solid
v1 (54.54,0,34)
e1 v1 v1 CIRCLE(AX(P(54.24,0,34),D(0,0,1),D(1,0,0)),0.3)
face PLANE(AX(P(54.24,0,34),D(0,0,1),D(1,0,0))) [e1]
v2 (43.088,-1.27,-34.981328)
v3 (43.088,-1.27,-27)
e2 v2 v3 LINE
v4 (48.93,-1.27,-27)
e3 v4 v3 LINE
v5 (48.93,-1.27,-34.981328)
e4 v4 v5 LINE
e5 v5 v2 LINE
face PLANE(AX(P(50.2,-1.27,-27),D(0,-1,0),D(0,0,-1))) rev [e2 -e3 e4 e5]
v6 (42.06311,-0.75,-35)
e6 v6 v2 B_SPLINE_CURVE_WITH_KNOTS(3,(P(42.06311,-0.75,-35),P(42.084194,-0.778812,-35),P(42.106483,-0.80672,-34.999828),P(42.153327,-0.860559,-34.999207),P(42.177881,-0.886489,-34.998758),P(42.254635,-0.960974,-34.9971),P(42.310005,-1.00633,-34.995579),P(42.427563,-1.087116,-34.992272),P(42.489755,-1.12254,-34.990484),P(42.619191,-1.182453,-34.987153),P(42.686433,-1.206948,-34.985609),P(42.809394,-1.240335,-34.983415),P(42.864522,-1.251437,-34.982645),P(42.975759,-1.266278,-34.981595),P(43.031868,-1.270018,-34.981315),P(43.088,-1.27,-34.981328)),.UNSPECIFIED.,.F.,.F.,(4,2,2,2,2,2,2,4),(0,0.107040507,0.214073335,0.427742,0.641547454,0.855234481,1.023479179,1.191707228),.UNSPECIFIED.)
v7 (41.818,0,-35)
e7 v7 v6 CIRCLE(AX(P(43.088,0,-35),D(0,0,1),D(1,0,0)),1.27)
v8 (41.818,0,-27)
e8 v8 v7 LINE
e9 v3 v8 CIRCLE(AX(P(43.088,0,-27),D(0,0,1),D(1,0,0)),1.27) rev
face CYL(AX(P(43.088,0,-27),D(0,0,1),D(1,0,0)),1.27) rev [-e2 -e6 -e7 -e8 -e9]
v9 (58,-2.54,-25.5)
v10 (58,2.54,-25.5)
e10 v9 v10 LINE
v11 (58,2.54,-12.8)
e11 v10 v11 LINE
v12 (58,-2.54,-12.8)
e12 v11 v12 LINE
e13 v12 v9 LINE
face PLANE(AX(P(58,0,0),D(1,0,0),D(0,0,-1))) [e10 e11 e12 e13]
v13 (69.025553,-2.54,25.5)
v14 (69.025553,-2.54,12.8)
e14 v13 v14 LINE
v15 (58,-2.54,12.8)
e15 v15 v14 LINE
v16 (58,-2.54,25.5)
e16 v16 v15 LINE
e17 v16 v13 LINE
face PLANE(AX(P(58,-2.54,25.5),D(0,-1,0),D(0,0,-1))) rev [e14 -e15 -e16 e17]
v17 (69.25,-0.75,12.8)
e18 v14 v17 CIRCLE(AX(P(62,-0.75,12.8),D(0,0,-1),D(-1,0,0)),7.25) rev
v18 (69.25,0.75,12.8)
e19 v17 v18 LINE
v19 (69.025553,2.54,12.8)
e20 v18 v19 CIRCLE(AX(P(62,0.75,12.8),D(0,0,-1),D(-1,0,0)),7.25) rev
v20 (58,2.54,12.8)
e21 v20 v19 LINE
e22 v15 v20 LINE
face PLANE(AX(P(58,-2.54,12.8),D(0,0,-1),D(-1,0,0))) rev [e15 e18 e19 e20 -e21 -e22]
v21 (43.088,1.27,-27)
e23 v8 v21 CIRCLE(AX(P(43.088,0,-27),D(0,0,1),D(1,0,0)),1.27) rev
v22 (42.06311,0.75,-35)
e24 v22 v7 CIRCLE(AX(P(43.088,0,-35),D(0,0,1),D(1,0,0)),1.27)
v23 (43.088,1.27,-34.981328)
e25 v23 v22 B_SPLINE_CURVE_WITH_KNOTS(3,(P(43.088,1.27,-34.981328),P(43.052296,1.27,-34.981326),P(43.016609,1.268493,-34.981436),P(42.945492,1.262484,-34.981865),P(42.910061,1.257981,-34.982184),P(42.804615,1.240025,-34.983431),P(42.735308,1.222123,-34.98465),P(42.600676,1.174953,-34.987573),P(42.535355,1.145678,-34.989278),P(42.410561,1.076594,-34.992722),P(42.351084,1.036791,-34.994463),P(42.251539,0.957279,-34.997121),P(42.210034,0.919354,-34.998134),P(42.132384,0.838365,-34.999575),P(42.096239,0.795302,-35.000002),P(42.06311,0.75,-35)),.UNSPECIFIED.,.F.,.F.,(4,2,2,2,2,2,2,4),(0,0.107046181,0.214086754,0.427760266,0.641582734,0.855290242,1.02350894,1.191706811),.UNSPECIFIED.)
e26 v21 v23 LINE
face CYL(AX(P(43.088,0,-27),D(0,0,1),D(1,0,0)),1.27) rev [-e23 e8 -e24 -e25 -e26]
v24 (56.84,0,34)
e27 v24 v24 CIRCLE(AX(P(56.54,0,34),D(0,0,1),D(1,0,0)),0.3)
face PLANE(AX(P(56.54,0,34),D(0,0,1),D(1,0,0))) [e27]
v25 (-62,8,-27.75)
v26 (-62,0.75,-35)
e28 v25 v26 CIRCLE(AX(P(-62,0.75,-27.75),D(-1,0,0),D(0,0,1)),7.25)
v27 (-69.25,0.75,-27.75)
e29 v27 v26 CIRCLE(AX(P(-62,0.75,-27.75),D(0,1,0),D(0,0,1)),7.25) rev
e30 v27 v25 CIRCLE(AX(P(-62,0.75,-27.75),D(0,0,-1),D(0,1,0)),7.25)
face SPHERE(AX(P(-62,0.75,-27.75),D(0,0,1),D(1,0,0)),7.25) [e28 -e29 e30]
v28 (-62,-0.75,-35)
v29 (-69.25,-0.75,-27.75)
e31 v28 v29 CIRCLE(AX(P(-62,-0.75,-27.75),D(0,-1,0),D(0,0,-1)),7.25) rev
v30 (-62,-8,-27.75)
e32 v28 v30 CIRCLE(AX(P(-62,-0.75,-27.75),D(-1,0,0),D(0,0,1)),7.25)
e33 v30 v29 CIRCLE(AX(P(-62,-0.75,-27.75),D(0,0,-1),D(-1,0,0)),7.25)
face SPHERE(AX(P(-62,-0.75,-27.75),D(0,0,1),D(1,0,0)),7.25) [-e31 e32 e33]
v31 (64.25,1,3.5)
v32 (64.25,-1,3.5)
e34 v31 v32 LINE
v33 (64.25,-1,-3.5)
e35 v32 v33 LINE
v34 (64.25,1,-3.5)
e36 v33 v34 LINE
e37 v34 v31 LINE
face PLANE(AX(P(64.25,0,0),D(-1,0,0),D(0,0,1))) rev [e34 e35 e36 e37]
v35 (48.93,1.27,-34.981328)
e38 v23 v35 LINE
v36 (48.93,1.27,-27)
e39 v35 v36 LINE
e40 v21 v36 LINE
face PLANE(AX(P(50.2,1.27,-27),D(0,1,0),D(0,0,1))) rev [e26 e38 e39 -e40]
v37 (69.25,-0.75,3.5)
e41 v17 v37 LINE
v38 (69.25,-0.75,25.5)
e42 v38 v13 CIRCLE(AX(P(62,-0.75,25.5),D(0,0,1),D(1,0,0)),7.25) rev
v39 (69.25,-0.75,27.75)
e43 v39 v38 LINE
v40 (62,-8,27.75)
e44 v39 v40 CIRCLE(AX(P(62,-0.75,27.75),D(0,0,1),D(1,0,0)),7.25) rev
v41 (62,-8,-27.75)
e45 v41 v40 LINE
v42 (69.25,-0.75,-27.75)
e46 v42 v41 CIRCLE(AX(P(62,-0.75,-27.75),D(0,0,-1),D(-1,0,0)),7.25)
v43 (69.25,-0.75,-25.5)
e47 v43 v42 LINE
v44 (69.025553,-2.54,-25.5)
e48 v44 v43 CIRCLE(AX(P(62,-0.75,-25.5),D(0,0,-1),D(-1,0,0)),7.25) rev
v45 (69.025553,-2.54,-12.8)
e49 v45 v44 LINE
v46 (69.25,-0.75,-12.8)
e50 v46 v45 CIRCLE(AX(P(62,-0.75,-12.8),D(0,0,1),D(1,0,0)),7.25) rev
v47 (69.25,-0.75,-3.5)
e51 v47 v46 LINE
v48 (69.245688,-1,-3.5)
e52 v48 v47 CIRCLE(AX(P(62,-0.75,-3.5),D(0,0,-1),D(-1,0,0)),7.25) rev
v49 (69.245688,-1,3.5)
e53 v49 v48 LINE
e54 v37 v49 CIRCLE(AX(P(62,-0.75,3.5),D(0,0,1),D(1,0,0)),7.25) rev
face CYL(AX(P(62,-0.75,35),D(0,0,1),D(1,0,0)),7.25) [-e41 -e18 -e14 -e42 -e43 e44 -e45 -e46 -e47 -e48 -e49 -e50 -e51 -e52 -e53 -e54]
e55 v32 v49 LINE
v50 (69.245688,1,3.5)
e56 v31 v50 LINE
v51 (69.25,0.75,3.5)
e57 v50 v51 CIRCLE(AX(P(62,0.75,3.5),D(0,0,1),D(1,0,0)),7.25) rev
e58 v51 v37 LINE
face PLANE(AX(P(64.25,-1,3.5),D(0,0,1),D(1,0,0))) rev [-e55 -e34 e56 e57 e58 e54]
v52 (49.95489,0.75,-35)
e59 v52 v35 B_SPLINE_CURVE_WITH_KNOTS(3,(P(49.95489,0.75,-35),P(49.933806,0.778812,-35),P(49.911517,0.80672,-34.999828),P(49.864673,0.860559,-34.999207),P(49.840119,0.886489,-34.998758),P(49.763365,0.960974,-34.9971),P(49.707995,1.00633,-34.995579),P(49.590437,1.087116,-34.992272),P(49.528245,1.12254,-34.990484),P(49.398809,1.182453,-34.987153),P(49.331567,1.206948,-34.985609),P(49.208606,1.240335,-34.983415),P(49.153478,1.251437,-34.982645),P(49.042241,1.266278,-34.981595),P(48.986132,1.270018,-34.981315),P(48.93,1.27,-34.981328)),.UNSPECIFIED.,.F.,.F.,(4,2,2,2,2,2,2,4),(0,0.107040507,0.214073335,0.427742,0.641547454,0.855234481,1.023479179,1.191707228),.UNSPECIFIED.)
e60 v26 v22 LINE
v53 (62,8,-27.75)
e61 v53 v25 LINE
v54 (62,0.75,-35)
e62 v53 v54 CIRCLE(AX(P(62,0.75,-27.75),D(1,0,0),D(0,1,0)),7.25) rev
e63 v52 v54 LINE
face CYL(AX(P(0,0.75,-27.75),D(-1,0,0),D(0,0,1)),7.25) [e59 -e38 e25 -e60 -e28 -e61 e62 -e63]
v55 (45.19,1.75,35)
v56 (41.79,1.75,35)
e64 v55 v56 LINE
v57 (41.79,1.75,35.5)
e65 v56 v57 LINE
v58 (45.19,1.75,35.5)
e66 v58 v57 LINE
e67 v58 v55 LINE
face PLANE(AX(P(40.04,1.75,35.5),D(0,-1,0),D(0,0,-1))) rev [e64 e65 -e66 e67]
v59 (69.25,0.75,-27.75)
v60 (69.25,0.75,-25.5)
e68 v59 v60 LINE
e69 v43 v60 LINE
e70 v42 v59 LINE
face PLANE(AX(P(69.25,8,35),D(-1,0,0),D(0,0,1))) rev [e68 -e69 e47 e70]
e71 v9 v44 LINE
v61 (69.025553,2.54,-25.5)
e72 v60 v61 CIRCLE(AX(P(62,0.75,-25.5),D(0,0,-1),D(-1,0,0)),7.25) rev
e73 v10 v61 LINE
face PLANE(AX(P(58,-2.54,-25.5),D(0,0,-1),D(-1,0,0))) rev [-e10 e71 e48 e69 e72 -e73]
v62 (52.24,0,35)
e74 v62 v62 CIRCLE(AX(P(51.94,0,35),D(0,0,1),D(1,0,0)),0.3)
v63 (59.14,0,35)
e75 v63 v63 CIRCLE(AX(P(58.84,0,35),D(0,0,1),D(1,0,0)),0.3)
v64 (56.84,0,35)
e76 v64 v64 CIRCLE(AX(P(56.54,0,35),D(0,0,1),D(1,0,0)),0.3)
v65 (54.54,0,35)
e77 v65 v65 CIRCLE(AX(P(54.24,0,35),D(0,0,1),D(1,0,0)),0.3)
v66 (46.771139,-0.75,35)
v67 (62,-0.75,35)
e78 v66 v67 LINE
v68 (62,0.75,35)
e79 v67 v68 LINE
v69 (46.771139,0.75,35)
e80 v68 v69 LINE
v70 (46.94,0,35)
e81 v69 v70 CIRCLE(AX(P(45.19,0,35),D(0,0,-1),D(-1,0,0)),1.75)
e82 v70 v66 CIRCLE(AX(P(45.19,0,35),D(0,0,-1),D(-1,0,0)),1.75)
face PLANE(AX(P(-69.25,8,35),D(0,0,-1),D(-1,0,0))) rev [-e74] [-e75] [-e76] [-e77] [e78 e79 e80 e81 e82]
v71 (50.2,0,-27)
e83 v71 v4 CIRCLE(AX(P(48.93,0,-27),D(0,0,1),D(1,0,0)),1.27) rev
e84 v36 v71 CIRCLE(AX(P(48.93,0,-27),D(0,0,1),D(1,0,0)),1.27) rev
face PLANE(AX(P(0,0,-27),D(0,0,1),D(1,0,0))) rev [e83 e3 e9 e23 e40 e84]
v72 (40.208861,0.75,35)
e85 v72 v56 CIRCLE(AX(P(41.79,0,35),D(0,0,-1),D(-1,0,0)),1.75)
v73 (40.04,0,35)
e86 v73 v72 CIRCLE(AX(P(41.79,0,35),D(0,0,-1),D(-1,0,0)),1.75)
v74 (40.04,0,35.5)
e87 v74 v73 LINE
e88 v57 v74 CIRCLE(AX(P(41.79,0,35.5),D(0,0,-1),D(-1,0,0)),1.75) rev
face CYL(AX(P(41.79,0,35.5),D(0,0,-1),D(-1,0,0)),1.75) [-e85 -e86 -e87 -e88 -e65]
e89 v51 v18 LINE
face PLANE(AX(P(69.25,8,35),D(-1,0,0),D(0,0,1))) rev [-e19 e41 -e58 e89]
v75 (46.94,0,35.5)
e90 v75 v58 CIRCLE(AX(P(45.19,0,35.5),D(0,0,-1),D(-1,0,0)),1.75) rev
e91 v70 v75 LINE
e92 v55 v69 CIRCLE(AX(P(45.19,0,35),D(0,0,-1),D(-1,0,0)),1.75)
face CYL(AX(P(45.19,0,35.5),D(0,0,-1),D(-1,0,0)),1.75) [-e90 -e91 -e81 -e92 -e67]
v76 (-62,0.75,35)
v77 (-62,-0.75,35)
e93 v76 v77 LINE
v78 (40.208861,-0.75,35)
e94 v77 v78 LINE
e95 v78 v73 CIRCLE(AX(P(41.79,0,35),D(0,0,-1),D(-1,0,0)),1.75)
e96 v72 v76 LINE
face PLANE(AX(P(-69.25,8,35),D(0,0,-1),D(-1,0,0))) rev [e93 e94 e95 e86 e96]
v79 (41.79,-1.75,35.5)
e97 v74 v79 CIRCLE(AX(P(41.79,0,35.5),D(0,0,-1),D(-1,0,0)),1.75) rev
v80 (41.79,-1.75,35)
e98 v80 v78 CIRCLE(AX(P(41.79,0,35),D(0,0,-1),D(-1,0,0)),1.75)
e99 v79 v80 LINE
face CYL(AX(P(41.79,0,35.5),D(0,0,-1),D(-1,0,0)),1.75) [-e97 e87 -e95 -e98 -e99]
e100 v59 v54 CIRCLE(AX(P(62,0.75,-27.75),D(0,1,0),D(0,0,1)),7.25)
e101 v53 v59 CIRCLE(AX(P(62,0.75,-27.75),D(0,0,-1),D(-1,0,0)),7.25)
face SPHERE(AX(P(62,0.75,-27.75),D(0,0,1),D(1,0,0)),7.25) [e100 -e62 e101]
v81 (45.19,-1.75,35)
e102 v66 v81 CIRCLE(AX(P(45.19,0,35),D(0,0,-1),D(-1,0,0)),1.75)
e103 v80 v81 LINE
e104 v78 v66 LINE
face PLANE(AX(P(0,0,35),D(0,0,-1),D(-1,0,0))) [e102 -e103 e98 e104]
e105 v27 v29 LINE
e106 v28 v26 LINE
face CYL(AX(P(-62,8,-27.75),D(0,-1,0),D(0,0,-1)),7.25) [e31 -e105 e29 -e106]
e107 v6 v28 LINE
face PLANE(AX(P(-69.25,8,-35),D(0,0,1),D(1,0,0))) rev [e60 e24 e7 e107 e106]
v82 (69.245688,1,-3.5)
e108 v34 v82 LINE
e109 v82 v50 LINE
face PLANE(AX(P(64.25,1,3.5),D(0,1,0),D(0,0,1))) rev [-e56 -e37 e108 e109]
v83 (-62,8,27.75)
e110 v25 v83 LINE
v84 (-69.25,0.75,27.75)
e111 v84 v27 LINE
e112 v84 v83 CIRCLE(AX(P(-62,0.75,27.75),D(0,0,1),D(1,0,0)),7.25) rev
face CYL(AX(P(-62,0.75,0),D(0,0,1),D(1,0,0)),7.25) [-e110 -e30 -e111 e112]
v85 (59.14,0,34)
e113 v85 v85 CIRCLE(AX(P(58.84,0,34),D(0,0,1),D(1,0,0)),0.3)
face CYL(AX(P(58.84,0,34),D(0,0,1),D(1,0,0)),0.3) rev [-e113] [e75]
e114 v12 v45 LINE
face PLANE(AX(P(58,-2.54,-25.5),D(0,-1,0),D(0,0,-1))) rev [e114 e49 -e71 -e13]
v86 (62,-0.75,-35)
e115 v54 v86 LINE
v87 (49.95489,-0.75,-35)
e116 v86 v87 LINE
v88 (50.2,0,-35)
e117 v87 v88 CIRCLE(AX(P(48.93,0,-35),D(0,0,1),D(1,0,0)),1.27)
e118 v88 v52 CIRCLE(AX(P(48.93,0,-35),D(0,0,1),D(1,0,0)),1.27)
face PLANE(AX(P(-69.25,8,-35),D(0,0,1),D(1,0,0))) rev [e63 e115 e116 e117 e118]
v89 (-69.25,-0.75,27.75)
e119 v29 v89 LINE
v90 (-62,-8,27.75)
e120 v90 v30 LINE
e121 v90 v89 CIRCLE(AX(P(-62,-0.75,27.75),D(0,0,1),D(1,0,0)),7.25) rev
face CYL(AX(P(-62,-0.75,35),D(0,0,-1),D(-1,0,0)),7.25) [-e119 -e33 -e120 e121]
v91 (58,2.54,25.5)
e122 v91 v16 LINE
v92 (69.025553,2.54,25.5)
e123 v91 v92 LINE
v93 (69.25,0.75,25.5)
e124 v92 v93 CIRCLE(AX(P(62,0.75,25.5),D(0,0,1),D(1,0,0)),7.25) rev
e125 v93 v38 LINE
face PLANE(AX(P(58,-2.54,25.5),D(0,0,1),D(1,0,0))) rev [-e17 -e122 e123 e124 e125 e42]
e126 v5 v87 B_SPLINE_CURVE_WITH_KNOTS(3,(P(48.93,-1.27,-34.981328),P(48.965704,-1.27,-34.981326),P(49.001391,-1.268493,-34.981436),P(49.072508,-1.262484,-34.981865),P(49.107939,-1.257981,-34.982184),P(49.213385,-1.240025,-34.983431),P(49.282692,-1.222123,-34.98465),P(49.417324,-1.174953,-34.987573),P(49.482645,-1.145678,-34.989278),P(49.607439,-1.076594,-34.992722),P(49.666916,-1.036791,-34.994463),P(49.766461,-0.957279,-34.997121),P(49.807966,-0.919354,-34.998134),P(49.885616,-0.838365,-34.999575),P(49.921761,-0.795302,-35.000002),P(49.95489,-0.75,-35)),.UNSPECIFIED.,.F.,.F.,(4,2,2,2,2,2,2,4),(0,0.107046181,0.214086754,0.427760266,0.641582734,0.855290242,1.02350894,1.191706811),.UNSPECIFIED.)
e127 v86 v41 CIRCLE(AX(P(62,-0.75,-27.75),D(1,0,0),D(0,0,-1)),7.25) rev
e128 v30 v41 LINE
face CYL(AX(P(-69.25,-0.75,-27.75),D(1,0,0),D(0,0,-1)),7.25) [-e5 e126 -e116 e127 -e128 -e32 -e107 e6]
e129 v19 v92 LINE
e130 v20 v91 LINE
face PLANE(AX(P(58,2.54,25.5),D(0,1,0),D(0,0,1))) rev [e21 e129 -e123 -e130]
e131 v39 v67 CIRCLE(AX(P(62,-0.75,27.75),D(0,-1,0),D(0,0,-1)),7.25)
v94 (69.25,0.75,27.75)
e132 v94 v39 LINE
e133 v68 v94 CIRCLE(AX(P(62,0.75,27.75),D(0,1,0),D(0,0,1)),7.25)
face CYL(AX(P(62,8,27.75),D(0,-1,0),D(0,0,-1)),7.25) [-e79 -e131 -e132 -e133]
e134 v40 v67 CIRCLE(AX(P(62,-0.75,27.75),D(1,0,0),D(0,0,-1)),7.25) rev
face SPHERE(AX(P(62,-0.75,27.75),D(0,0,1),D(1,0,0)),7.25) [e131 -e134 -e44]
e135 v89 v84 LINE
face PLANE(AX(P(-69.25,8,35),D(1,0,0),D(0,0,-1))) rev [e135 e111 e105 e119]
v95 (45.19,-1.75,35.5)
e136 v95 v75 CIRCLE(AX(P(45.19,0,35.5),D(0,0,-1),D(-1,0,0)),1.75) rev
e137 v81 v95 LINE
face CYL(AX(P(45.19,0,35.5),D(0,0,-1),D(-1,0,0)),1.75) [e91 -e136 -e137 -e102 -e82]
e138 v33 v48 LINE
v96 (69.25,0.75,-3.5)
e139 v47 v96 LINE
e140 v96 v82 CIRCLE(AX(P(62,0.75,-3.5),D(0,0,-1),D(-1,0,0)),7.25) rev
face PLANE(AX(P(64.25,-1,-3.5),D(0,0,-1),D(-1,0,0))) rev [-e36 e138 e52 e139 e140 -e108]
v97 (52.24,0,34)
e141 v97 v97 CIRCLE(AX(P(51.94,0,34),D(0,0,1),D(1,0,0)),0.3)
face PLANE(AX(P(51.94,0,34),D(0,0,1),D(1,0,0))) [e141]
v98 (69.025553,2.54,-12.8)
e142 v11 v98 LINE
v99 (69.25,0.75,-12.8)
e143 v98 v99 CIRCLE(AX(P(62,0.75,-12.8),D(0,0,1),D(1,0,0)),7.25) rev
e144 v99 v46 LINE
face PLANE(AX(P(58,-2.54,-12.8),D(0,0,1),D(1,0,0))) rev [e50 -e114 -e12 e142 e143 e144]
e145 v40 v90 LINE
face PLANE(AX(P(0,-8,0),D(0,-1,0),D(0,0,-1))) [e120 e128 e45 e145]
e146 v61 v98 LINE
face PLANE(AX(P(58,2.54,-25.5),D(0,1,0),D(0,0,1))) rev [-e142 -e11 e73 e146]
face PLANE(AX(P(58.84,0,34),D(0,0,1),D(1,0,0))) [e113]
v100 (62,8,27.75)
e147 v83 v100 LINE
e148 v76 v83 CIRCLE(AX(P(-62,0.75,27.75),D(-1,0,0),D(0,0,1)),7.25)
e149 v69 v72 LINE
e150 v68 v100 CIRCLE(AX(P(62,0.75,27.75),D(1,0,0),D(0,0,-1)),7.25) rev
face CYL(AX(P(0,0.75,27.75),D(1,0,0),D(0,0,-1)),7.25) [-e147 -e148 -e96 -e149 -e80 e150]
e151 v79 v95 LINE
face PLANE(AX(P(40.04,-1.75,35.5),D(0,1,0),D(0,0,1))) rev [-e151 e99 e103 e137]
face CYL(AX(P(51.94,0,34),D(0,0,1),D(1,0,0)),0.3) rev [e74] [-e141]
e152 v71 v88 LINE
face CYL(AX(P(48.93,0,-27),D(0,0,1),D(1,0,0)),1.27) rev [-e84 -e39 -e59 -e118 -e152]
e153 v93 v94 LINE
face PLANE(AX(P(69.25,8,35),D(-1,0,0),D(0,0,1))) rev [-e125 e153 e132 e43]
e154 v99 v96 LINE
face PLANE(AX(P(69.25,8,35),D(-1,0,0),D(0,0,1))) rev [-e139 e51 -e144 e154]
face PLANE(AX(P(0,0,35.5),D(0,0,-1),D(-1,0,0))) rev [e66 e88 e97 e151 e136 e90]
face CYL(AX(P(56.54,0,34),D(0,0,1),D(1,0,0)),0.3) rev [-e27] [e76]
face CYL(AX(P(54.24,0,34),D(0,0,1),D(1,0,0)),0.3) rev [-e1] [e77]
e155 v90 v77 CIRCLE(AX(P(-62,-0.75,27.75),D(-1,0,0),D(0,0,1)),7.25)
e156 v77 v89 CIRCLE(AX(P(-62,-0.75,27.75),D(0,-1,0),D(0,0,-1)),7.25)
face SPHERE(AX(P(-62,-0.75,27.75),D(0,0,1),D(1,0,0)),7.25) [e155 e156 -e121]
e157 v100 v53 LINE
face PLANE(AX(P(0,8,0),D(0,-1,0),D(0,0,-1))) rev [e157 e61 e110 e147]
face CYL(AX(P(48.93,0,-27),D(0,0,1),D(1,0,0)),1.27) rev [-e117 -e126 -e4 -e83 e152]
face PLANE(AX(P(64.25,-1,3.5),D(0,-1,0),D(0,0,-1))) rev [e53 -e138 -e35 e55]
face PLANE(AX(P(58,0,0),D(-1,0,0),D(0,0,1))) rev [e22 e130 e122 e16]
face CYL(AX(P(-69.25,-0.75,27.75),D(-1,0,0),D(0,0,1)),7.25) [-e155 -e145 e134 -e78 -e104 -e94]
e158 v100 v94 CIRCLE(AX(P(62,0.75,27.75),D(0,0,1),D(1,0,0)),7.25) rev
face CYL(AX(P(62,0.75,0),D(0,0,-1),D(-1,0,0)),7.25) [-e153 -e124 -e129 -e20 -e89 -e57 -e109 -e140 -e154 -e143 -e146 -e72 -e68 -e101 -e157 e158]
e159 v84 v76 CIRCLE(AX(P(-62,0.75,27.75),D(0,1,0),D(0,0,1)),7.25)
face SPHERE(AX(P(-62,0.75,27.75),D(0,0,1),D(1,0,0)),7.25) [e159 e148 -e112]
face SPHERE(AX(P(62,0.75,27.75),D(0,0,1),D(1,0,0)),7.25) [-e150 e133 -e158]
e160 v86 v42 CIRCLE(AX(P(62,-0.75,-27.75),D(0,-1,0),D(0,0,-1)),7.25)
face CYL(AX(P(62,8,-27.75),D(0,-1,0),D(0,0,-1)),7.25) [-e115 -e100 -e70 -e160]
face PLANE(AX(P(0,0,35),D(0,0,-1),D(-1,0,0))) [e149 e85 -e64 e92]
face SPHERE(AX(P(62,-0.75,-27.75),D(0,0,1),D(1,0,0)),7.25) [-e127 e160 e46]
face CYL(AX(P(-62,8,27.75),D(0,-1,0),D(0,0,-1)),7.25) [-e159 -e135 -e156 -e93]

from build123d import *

# Parameters (mm, degrees)
SKETCH1_W                  = 138.5
SKETCH1_H                  = 70
BOSS_EXTRUDE1_DEPTH        = 8
FILLET1_R                  = 7.25
SKETCH3_W                  = 12.7
SKETCH3_H                  = 5.08
USB_A_DEPTH                = 11.25
SKETCH4_W                  = 7
SKETCH4_H                  = 2
USB_MICRO_NOTTOSCALE_DEPTH = 5
SKETCH5_W                  = 8.382
SKETCH5_H                  = 2.54
USB_C_DEPTH                = 8
FILLET2_R                  = 1.27
SKETCH6_W                  = 6.9
SKETCH6_H                  = 3.5
BATTERY_LEVEL_DEPTH        = 0.5
FILLET3_R                  = 1.75
SKETCH7_R                  = 0.3
BATTERY_LIGHTS_DEPTH       = 1


# Some blends are built 0.0001 mm under size
with BuildPart() as part:
    # Sketch1 → Boss-Extrude1 (new, symmetric)
    with BuildSketch(Plane(origin=(0, 0, 0), x_dir=(1, 0, 0), z_dir=(0, 1, 0))):
        Rectangle(SKETCH1_W, SKETCH1_H)
    extrude(amount=BOSS_EXTRUDE1_DEPTH, both=True)

    # Fillet1
    fillet1_edges = [part.edges().sort_by_distance(p)[0] for p in [
        (-69.25, 8, 0),
        (0, 8, 35),
        (69.25, 8, 0),
        (0, -8, 35),
        (-69.25, -8, 0),
        (0, -8, -35),
        (69.25, -8, 0),
        (69.25, 0, 35),
        (-69.25, 0, 35),
        (-69.25, 0, -35),
        (69.25, 0, -35),
        (0, 8, -35),
    ]]
    fillet(fillet1_edges, radius=FILLET1_R)

    # Sketch3 → USB-A (cut)
    with BuildSketch(Plane(origin=(69.25, 0, 0), x_dir=(0, 0, -1), z_dir=(1, 0, 0))):
        with Locations((-19.15, 0)):
            Rectangle(SKETCH3_W, SKETCH3_H)
        with Locations((19.15, 0)):
            Rectangle(SKETCH3_W, SKETCH3_H)
    extrude(amount=-USB_A_DEPTH, mode=Mode.SUBTRACT)

    # Sketch4 → USB-micro-NOTtoSCALE (cut)
    with BuildSketch(Plane(origin=(69.25, 0, 0), x_dir=(0, 0, -1), z_dir=(1, 0, 0))):
        Rectangle(SKETCH4_W, SKETCH4_H)
    extrude(amount=-USB_MICRO_NOTTOSCALE_DEPTH, mode=Mode.SUBTRACT)

    # Sketch5 → USB-C (cut)
    with BuildSketch(Plane(origin=(0, 0, -35), x_dir=(-1, 0, 0), z_dir=(0, 0, -1))):
        with Locations((-46.009, 0)):
            Rectangle(SKETCH5_W, SKETCH5_H)
    extrude(amount=-USB_C_DEPTH, mode=Mode.SUBTRACT)

    # Fillet2
    fillet2_edges = [part.edges().sort_by_distance(p)[0] for p in [
        (41.818, 1.27, -30.990663839),
        (41.818, -1.27, -30.990663839),
        (50.2, -1.27, -30.990663839),
        (50.2, 1.27, -30.990663839),
    ]]
    fillet(fillet2_edges, radius=FILLET2_R - 0.0001)  # a hair under: the kernel refuses the full size

    # Sketch6 → battery level (add)
    with BuildSketch(Plane.XY.offset(35)):
        with Locations((43.49, 0)):
            Rectangle(SKETCH6_W, SKETCH6_H)
    extrude(amount=BATTERY_LEVEL_DEPTH)

    # Fillet3
    # the kernel refuses this fillet: 1.75 mm, written as the material it takes off along each edge
    with BuildSketch(Plane(origin=(40.04, -1.75, 35), x_dir=(0, 1, 0), z_dir=(0, 0, 1))) as fillet3_piece_1:
        with BuildLine():
            CenterArc((FILLET3_R, -FILLET3_R), FILLET3_R, 90, 90)
            Line((0, -FILLET3_R), (0, 0))
            Line((0, 0), (FILLET3_R, 0))
        make_face()
    extrude(amount=4.875, mode=Mode.SUBTRACT)
    with BuildSketch(Plane(origin=(40.04, 1.75, 35), x_dir=(0, -1, 0), z_dir=(0, 0, 1)), Plane(origin=(46.94, -1.75, 35), x_dir=(0, 1, 0), z_dir=(0, 0, 1)), Plane(origin=(46.94, 1.75, 35), x_dir=(-1, 0, 0), z_dir=(0, 0, 1))) as fillet3_piece_2:
        with BuildLine():
            CenterArc((FILLET3_R, FILLET3_R), FILLET3_R, 180, 90)
            Line((0, FILLET3_R), (0, 0))
            Line((0, 0), (FILLET3_R, 0))
        make_face()
    extrude(amount=4.875, mode=Mode.SUBTRACT)

    # Sketch7 → battery lights (cut)
    with BuildSketch(Plane.XY.offset(35)):
        with Locations((51.94, 0)):
            Circle(SKETCH7_R)
        with Locations((54.24, 0)):
            Circle(SKETCH7_R)
        with Locations((56.54, 0)):
            Circle(SKETCH7_R)
        with Locations((58.84, 0)):
            Circle(SKETCH7_R)
    extrude(amount=-BATTERY_LIGHTS_DEPTH, mode=Mode.SUBTRACT)


solid = part.part
